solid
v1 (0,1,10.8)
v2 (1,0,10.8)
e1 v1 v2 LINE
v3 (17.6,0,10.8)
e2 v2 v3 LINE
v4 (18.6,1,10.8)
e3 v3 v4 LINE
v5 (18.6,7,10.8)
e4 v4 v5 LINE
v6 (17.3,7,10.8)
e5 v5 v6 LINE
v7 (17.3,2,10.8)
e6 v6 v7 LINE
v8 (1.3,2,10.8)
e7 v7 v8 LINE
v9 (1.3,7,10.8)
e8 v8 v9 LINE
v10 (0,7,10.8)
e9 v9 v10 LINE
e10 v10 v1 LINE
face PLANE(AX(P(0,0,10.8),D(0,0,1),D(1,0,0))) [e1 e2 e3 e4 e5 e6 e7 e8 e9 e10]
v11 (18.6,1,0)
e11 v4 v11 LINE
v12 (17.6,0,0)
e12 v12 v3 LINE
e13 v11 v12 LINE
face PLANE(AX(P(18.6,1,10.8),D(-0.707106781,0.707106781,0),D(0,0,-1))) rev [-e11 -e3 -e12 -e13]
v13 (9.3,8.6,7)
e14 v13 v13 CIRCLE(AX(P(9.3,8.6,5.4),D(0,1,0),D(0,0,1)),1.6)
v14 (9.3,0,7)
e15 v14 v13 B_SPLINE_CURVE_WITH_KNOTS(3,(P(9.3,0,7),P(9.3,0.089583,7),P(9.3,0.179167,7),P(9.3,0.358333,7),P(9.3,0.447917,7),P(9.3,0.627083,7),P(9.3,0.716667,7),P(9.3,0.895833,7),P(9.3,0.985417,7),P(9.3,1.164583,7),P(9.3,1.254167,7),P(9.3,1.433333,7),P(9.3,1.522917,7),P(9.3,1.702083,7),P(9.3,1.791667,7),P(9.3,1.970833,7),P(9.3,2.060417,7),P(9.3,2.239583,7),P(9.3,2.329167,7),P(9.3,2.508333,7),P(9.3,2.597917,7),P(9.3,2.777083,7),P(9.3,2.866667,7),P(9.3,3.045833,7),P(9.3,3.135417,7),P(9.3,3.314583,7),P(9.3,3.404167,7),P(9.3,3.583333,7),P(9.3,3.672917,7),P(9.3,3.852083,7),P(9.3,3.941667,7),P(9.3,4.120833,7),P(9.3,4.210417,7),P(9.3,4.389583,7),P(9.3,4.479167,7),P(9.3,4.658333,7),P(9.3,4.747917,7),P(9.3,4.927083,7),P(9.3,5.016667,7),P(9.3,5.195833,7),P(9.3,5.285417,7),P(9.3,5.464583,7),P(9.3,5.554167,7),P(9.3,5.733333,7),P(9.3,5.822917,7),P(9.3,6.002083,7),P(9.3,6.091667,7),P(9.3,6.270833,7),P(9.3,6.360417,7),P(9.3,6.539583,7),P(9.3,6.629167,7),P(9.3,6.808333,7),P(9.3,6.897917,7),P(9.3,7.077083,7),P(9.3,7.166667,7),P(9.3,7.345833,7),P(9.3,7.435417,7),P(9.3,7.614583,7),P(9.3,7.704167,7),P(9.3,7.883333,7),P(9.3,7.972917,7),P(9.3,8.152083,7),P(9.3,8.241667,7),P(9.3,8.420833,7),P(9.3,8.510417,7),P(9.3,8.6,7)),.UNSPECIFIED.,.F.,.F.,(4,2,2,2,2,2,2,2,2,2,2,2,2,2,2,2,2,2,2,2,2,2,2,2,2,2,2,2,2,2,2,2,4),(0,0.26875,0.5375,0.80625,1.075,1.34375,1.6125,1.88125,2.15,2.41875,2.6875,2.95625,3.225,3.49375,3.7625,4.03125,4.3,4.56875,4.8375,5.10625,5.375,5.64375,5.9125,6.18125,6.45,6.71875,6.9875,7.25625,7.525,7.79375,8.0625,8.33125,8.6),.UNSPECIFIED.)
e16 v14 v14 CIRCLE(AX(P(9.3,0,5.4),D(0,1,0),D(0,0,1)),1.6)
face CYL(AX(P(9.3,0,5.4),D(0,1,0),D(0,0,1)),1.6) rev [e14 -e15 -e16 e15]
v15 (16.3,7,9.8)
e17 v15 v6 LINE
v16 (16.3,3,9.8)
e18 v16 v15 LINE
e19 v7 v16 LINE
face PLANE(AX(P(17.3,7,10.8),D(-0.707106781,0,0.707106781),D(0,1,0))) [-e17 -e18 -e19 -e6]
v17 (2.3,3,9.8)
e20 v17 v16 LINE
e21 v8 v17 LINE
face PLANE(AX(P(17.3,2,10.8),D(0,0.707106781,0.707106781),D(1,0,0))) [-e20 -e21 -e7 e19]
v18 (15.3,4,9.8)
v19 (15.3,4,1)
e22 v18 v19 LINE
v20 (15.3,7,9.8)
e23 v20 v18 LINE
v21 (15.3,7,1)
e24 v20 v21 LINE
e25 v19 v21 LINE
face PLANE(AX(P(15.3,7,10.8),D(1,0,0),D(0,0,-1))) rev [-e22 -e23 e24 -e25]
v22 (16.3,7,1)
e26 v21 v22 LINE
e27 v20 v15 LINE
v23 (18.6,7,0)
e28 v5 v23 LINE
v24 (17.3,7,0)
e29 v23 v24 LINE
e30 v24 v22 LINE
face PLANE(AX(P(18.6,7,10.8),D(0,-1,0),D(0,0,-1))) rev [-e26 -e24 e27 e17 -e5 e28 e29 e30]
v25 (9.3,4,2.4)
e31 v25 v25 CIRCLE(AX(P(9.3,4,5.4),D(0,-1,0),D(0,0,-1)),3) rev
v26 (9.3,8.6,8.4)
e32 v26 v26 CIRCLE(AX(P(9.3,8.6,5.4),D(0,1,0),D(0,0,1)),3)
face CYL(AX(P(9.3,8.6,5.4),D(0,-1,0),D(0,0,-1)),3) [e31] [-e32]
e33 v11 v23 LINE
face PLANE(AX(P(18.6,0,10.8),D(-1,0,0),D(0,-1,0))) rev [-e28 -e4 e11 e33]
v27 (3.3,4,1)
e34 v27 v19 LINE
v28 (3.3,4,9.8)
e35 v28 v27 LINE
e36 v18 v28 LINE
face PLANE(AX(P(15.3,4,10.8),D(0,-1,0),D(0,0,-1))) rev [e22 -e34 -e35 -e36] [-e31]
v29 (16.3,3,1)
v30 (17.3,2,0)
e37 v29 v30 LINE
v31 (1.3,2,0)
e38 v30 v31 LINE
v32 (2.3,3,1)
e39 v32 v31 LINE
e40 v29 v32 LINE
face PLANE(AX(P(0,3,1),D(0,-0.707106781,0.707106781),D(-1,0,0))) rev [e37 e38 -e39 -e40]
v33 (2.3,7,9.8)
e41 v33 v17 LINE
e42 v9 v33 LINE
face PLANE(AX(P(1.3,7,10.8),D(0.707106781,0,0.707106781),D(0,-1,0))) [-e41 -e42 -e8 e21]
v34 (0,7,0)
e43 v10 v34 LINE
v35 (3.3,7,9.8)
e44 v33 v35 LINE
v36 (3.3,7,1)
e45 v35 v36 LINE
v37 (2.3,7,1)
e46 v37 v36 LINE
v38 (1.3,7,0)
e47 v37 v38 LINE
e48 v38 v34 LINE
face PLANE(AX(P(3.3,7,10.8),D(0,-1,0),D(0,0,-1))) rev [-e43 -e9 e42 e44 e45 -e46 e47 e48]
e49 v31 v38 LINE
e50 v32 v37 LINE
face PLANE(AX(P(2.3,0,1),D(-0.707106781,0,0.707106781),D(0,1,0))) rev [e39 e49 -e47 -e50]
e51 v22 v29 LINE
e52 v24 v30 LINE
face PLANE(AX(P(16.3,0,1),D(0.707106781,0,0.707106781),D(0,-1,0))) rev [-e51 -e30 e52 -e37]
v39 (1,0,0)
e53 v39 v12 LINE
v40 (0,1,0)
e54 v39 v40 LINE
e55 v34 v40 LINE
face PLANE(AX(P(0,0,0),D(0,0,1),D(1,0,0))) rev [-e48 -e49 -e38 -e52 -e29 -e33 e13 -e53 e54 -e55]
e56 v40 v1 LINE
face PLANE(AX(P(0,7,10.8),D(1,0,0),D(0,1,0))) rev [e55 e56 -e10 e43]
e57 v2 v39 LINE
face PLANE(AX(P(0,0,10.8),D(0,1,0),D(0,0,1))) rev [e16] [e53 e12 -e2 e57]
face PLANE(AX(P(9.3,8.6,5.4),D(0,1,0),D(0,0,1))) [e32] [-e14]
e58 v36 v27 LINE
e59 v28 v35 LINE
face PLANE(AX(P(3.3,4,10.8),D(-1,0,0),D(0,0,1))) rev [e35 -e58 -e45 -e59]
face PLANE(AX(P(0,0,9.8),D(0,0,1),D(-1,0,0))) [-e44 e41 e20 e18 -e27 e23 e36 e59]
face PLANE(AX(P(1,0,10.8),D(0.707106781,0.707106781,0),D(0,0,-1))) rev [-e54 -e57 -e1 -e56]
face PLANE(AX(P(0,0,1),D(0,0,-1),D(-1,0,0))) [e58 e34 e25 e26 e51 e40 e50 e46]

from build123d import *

# Parameters (mm, degrees)
BOSS_EXTRUDE1_DEPTH      = 10.8
SKETCH2_R                = 3
BOSS_EXTRUDE2_DEPTH      = 4.6
SKETCH3_R                = 1.6
CUT_EXTRUDE1_DEPTH       = 24.163764806
CHAMFER1_SIZE            = 1
SKETCH4_W                = 16
SKETCH4_H                = 5
CUT_EXTRUDE2_DEPTH       = 1
CHAMFER2_SIZE            = 1
CHAMFER2_OF_MIRROR1_SIZE = 1


with BuildPart() as part:
    # Sketch1 → Boss-Extrude1 (new body)
    with BuildSketch(Plane.XY):
        Polygon((0, 0), (18.6, 0), (18.6, 7), (15.3, 7), (15.3, 4), (3.3, 4), (3.3, 7), (0, 7), align=None)
    extrude(amount=BOSS_EXTRUDE1_DEPTH)

    # Sketch2 → Boss-Extrude2 (add)
    with BuildSketch(Plane(origin=(0, 4, 0), x_dir=(1, 0, 0), z_dir=(0, 1, 0))):
        with Locations(Location((9.3, -5.4, 0), (0, 0, 90))):
            Circle(SKETCH2_R)
    extrude(amount=BOSS_EXTRUDE2_DEPTH)

    # Sketch3 → Cut-Extrude1 (cut, through all)
    with BuildSketch(Plane(origin=(0, 8.6, 0), x_dir=(1, 0, 0), z_dir=(0, 1, 0))):
        with Locations(Location((9.3, -5.4, 0), (0, 0, 270))):
            Circle(SKETCH3_R)
    extrude(amount=-CUT_EXTRUDE1_DEPTH, mode=Mode.SUBTRACT)

    # Chamfer1
    chamfer1_edges = [part.edges().sort_by_distance(p)[0] for p in [
        (18.6, 0, 5.4),
        (0, 0, 5.4),
    ]]
    chamfer(chamfer1_edges, length=CHAMFER1_SIZE)

    # Sketch4 → Cut-Extrude2 (cut)
    with BuildSketch(Plane(origin=(0, 0, 0), x_dir=(-1, 0, 0), z_dir=(0, 0, -1))):
        with Locations((-9.3, 4.5)):
            Rectangle(SKETCH4_W, SKETCH4_H)
    cut_extrude2 = extrude(amount=-CUT_EXTRUDE2_DEPTH, mode=Mode.SUBTRACT)

    # Chamfer2
    chamfer2_edges = [part.edges().sort_by_distance(p)[0] for p in [
        (1.3, 4.5, 1),
        (17.3, 4.5, 1),
        (9.3, 2, 1),
    ]]
    chamfer(chamfer2_edges, length=CHAMFER2_SIZE - 0.0001)  # a hair under: the kernel refuses the full size

    # Mirror1: Cut-Extrude2 across plane
    add(cut_extrude2.mirror(Plane(origin=(0, 0, 5.4), x_dir=(1, 0, 0), z_dir=(0, 0, -1))), mode=Mode.SUBTRACT)

    # Chamfer2 of Mirror1
    chamfer2_of_mirror1_edges = [part.edges().sort_by_distance(p)[0] for p in [
        (1.3, 4.5, 9.8),
        (17.3, 4.5, 9.8),
        (9.3, 2, 9.8),
    ]]
    chamfer(chamfer2_of_mirror1_edges, length=CHAMFER2_OF_MIRROR1_SIZE - 0.0001)  # a hair under: the kernel refuses the full size


solid = part.part
